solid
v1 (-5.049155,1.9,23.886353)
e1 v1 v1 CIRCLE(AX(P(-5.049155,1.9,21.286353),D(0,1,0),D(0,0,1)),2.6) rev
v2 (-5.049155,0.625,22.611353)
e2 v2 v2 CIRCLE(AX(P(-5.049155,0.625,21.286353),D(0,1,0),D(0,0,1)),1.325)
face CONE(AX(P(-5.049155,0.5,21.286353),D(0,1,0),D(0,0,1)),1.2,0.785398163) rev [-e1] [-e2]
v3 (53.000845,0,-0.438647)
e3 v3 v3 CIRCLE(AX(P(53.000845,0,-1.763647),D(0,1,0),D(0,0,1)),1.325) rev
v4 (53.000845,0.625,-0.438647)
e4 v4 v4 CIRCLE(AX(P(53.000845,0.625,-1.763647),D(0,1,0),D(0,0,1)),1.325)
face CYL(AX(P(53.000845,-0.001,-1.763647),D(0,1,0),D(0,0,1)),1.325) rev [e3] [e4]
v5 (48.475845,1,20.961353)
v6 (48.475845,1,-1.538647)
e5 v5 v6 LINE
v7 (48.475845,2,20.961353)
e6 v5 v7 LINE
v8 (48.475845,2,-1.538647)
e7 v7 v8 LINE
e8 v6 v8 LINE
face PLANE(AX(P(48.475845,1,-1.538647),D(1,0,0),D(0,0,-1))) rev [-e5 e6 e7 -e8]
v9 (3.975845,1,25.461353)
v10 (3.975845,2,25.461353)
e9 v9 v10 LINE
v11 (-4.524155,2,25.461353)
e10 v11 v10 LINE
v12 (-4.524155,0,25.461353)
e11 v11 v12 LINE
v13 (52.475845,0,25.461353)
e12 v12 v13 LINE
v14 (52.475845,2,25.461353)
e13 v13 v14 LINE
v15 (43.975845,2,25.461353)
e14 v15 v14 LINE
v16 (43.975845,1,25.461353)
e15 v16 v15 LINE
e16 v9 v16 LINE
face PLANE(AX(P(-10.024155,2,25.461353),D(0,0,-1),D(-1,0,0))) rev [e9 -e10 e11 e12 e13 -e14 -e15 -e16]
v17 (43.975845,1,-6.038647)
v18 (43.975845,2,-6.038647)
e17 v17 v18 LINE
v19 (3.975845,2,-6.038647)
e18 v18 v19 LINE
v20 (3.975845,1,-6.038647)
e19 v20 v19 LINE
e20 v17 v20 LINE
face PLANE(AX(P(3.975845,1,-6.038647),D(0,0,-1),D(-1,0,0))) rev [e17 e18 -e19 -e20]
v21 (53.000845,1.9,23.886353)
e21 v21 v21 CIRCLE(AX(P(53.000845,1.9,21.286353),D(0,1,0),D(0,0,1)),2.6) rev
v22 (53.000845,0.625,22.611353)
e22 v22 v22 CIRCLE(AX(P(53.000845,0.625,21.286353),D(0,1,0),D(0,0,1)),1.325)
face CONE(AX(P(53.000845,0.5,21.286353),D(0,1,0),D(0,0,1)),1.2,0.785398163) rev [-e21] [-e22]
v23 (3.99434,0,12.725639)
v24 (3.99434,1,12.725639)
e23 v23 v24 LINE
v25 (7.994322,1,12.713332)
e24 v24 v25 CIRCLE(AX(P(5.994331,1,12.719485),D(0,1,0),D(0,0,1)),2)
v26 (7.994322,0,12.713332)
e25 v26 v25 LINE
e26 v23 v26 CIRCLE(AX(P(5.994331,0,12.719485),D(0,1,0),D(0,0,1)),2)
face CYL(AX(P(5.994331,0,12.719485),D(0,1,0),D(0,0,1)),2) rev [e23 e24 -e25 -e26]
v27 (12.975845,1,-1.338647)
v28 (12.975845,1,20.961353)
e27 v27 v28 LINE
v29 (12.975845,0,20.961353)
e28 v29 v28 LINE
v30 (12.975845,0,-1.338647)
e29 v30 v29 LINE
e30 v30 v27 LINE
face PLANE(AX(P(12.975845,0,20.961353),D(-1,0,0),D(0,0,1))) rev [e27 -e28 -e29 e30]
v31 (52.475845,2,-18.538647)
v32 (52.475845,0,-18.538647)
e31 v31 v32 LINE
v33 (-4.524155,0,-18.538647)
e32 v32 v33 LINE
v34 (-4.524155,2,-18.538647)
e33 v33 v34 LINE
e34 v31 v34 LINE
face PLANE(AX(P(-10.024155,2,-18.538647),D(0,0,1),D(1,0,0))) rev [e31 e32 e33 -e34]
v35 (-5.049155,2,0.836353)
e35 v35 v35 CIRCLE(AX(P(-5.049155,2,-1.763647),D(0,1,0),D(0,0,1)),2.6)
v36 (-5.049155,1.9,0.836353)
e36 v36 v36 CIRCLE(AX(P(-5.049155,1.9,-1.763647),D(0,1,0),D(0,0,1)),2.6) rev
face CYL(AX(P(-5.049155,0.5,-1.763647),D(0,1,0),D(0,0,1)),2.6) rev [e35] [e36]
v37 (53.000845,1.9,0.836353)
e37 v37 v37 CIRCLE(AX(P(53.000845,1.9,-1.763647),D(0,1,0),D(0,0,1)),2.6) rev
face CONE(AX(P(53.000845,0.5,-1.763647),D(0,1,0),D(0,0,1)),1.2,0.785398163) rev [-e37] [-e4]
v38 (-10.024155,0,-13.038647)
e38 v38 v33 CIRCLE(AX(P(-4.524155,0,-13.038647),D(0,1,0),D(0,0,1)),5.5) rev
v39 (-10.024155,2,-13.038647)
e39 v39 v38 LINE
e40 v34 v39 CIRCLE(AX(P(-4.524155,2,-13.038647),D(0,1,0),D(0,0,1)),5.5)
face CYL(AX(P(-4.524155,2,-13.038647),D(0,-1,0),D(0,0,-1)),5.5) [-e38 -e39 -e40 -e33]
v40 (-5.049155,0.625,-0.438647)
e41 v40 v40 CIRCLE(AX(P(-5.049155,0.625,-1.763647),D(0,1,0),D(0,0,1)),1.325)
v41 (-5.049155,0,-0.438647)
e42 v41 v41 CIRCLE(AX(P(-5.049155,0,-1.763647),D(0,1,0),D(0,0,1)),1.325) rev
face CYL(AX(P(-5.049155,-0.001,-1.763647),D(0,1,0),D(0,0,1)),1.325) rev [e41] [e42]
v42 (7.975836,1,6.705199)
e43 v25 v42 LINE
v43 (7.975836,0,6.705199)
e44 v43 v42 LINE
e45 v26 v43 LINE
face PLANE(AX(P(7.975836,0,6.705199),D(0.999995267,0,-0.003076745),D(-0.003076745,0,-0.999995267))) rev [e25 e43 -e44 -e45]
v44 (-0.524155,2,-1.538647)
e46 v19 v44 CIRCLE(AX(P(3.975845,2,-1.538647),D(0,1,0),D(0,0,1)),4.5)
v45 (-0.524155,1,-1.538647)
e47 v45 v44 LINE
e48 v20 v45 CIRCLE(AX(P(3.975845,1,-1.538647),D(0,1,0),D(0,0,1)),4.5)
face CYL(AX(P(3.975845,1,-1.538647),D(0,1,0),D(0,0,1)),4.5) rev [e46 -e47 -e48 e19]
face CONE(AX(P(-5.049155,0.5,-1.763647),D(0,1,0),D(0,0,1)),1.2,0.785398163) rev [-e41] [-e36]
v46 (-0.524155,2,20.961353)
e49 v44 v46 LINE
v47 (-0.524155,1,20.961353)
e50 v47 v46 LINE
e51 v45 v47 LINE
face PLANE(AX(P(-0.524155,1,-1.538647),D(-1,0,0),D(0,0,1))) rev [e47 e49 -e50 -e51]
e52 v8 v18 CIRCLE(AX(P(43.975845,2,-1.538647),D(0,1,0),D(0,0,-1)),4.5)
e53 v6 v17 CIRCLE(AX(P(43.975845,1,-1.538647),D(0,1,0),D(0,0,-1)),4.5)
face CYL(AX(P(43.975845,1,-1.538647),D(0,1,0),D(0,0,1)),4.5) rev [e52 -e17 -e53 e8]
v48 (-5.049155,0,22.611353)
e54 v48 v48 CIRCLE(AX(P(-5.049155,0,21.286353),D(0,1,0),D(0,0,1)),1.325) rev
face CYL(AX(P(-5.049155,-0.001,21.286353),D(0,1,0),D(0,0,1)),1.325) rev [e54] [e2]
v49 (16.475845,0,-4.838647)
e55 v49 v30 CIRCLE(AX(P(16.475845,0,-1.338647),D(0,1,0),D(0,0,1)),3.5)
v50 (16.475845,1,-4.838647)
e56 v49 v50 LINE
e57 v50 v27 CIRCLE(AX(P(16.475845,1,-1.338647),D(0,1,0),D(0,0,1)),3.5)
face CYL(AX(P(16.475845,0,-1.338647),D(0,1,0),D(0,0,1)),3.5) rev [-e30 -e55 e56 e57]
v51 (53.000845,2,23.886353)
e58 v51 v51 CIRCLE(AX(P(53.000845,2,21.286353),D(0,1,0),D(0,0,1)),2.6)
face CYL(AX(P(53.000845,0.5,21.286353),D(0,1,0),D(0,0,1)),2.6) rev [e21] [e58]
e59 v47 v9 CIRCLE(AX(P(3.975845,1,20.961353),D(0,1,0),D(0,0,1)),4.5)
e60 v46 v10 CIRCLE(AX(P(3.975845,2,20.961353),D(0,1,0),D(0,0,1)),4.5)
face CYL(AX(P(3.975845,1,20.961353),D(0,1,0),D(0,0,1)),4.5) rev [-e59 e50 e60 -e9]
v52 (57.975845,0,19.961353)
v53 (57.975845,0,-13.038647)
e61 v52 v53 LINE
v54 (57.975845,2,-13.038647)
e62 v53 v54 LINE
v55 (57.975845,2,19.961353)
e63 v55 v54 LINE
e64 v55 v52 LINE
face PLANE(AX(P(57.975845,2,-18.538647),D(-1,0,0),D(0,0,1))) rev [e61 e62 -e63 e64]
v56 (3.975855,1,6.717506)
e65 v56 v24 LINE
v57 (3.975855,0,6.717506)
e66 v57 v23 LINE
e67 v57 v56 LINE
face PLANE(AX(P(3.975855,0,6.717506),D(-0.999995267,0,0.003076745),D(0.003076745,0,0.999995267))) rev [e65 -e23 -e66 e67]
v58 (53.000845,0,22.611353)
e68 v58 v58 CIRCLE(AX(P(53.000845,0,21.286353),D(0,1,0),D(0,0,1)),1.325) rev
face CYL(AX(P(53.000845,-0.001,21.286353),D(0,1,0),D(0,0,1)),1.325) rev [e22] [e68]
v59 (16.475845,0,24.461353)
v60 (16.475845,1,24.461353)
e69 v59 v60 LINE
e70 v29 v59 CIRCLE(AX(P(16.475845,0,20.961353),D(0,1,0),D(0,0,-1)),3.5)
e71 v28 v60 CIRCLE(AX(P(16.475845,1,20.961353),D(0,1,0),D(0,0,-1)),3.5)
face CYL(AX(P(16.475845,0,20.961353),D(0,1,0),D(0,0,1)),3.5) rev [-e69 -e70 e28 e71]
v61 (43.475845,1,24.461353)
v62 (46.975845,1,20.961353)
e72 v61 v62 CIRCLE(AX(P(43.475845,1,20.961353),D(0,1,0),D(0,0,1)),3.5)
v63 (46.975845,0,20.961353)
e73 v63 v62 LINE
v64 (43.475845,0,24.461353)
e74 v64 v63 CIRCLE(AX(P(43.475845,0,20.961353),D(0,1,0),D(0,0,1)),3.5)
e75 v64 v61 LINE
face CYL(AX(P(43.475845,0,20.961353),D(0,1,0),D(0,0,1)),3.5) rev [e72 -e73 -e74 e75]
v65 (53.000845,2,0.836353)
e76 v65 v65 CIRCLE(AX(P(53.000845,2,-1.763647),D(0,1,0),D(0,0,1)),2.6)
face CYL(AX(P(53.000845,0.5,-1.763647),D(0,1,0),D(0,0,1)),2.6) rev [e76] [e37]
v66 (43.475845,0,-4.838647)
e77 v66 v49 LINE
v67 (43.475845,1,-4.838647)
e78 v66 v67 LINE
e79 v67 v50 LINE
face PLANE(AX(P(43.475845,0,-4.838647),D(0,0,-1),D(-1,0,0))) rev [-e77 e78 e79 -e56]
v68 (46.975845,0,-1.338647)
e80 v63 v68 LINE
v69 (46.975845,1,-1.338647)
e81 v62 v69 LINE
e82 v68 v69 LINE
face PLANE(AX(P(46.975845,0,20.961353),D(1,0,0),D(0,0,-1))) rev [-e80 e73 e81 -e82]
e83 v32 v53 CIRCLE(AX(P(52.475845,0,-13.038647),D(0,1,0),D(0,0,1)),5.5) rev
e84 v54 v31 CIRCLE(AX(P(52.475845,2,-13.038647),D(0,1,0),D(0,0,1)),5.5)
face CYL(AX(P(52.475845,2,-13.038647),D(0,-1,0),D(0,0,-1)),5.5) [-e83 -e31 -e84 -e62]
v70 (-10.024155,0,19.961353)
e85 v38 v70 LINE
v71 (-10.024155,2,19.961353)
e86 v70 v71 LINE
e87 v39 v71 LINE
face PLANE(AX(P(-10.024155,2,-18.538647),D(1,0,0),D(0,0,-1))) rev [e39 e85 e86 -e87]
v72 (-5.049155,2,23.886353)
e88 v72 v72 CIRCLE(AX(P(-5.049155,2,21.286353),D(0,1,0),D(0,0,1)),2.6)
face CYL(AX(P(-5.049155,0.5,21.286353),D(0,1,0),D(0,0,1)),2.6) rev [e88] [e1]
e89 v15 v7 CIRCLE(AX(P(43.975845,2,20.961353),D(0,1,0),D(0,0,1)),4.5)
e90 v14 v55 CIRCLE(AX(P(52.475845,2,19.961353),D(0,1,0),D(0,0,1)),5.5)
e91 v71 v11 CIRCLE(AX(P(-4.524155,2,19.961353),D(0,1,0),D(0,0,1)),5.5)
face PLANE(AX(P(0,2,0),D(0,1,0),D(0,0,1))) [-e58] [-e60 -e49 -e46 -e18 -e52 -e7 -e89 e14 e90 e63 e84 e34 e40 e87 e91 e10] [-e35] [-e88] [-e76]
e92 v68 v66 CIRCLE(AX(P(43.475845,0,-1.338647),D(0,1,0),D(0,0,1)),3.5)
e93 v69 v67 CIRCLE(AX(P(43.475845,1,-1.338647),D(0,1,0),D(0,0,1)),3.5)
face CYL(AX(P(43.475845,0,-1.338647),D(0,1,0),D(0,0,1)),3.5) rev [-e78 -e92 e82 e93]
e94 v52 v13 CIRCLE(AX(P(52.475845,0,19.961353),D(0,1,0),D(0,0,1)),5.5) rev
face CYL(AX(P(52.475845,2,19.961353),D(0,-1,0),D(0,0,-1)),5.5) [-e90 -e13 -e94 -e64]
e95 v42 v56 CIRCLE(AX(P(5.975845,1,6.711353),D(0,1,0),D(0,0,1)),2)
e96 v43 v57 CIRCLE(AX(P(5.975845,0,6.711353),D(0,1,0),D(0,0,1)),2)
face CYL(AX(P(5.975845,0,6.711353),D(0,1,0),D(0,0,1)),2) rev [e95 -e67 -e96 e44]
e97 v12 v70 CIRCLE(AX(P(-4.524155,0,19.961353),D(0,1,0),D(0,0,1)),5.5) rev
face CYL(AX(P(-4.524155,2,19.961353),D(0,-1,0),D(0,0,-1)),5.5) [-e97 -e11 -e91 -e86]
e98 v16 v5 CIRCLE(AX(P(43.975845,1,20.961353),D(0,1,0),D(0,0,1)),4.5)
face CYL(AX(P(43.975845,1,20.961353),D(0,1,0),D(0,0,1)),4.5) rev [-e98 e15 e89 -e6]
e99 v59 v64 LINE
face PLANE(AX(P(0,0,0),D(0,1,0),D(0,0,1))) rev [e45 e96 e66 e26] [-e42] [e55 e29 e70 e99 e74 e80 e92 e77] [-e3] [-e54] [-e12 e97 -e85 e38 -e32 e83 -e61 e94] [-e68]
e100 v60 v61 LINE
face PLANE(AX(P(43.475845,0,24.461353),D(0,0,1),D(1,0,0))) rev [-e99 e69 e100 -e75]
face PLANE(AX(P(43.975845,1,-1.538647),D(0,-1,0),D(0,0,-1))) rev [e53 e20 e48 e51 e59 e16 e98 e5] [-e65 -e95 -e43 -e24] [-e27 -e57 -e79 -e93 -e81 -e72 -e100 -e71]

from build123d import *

# Parameters (mm, degrees)
SKETCH_1_W          = 68
SKETCH_1_H          = 44
EXTRUDE_1_DEPTH     = 2
FILLET_1_R          = 5.5
CUT_EXTRUDE_1_DEPTH = 1
CUT_EXTRUDE_2_DEPTH = 1
CUT_EXTRUDE_3_REACH = 65.352
SKETCH_5_R          = 1.325
CUT_EXTRUDE_5_DEPTH = 64.328343814
SKETCH_6_R          = 2.6
CUT_EXTRUDE_6_DEPTH = 1.5
CHAMFER_2_SIZE      = 1.4


with BuildPart() as part:
    # 草图1 → 凸台-拉伸1 (new body)
    with BuildSketch(Plane(origin=(0, 0, 0), x_dir=(1, 0, 0), z_dir=(0, 1, 0))):
        with Locations((23.975845411, -3.461352657)):
            Rectangle(SKETCH_1_W, SKETCH_1_H)
    extrude(amount=EXTRUDE_1_DEPTH)

    # 圆角1
    fillet_1_edges = [part.edges().sort_by_distance(p)[0] for p in [
        (-10.024154589, 1, -18.538647343),
        (57.975845411, 1, -18.538647343),
        (57.975845411, 1, 25.461352657),
        (-10.024154589, 1, 25.461352657),
    ]]
    fillet(fillet_1_edges, radius=FILLET_1_R)

    # 草图3 → 切除-拉伸1 (cut)
    with BuildSketch(Plane(origin=(0, 2, 0), x_dir=(1, 0, 0), z_dir=(0, 1, 0))):
        with BuildLine():
            Line((3.975845411, 6.038647343), (43.975845411, 6.038647343))
            ThreePointArc((43.975845411, 6.038647343), (47.157825926, 4.720627858), (48.475845411, 1.538647343))
            Line((48.475845411, 1.538647343), (48.475845411, -20.961352657))
            ThreePointArc((48.475845411, -20.961352657), (47.157825926, -24.143333172), (43.975845411, -25.461352657))
            Line((43.975845411, -25.461352657), (3.975845411, -25.461352657))
            ThreePointArc((3.975845411, -25.461352657), (0.793864895, -24.143333172), (-0.524154589, -20.961352657))
            Line((-0.524154589, -20.961352657), (-0.524154589, 1.538647343))
            ThreePointArc((-0.524154589, 1.538647343), (0.793864895, 4.720627858), (3.975845411, 6.038647343))
        make_face()
    extrude(amount=-CUT_EXTRUDE_1_DEPTH, mode=Mode.SUBTRACT)

    # 草图4 → 切除-拉伸2 (cut)
    with BuildSketch(Plane(origin=(0, 1, 0), x_dir=(1, 0, 0), z_dir=(0, 1, 0))):
        with BuildLine():
            Line((43.475845411, -24.461352657), (16.475845411, -24.461352657))
            ThreePointArc((16.475845411, -24.461352657), (14.000971676, -23.436226391), (12.975845411, -20.961352657))
            Line((12.975845411, -20.961352657), (12.975845411, 1.338647343))
            ThreePointArc((12.975845411, 1.338647343), (14.000971676, 3.813521077), (16.475845411, 4.838647343))
            Line((16.475845411, 4.838647343), (43.475845411, 4.838647343))
            ThreePointArc((43.475845411, 4.838647343), (45.950719145, 3.813521077), (46.975845411, 1.338647343))
            Line((46.975845411, 1.338647343), (46.975845411, -20.961352657))
            ThreePointArc((46.975845411, -20.961352657), (45.950719145, -23.436226391), (43.475845411, -24.461352657))
        make_face()
    extrude(amount=-CUT_EXTRUDE_2_DEPTH, mode=Mode.SUBTRACT)

    # 草图5 → 切除-拉伸3 (cut, up to next)
    with BuildSketch(Plane(origin=(0, 2, 0), x_dir=(1, 0, 0), z_dir=(0, 1, 0)), mode=Mode.PRIVATE) as cut_extrude_3_sk1:
        with Locations(Location((53.000845411, -21.286352657, 0), (0, 0, 270))):
            Circle(SKETCH_5_R)
    cut_extrude_3_tool1 = extrude(cut_extrude_3_sk1.sketch, amount=-CUT_EXTRUDE_3_REACH, mode=Mode.PRIVATE) & part.part
    # 草图5 → 切除-拉伸3 (cut, up to next)
    with BuildSketch(Plane(origin=(0, 2, 0), x_dir=(1, 0, 0), z_dir=(0, 1, 0)), mode=Mode.PRIVATE) as cut_extrude_3_sk2:
        with Locations(Location((53.000845411, 1.763647343, 0), (0, 0, 270))):
            Circle(SKETCH_5_R)
    cut_extrude_3_tool2 = extrude(cut_extrude_3_sk2.sketch, amount=-CUT_EXTRUDE_3_REACH, mode=Mode.PRIVATE) & part.part
    # 草图5 → 切除-拉伸3 (cut, up to next)
    with BuildSketch(Plane(origin=(0, 2, 0), x_dir=(1, 0, 0), z_dir=(0, 1, 0)), mode=Mode.PRIVATE) as cut_extrude_3_sk3:
        with Locations(Location((-5.049154589, 1.763647343, 0), (0, 0, 270))):
            Circle(SKETCH_5_R)
    cut_extrude_3_tool3 = extrude(cut_extrude_3_sk3.sketch, amount=-CUT_EXTRUDE_3_REACH, mode=Mode.PRIVATE) & part.part
    # 草图5 → 切除-拉伸3 (cut, up to next)
    with BuildSketch(Plane(origin=(0, 2, 0), x_dir=(1, 0, 0), z_dir=(0, 1, 0)), mode=Mode.PRIVATE) as cut_extrude_3_sk4:
        with Locations(Location((-5.049154589, -21.286352657, 0), (0, 0, 270))):
            Circle(SKETCH_5_R)
    cut_extrude_3_tool4 = extrude(cut_extrude_3_sk4.sketch, amount=-CUT_EXTRUDE_3_REACH, mode=Mode.PRIVATE) & part.part
    add(cut_extrude_3_tool1.solids().sort_by_distance((53.000845, 2, 21.286353))[0], mode=Mode.SUBTRACT)
    add(cut_extrude_3_tool2.solids().sort_by_distance((53.000845, 2, -1.763647))[0], mode=Mode.SUBTRACT)
    add(cut_extrude_3_tool3.solids().sort_by_distance((-5.049155, 2, -1.763647))[0], mode=Mode.SUBTRACT)
    add(cut_extrude_3_tool4.solids().sort_by_distance((-5.049155, 2, 21.286353))[0], mode=Mode.SUBTRACT)

    # 草图7 → 切除-拉伸5 (cut, through all)
    with BuildSketch(Plane(origin=(0, 1, 0), x_dir=(1, 0, 0), z_dir=(0, 1, 0))):
        with BuildLine():
            Line((7.975835944, -6.705199166), (7.994321526, -12.713332009))
            ThreePointArc((7.994321526, -12.713332009), (6.000484483, -14.719476033), (3.994340459, -12.72563899))
            Line((3.994340459, -12.72563899), (3.975854877, -6.717506148))
            ThreePointArc((3.975854877, -6.717506148), (5.96969192, -4.711362123), (7.975835944, -6.705199166))
        make_face()
    extrude(amount=-CUT_EXTRUDE_5_DEPTH, mode=Mode.SUBTRACT)

    # 草图6 → 切除-拉伸6 (cut)
    with BuildSketch(Plane(origin=(0, 2, 0), x_dir=(1, 0, 0), z_dir=(0, 1, 0))):
        with Locations(Location((-5.049154589, 1.763647343, 0), (0, 0, 270))):
            Circle(SKETCH_6_R)
        with Locations(Location((-5.049154589, -21.286352657, 0), (0, 0, 270))):
            Circle(SKETCH_6_R)
        with Locations(Location((53.000845411, 1.763647343, 0), (0, 0, 270))):
            Circle(SKETCH_6_R)
        with Locations(Location((53.000845411, -21.286352657, 0), (0, 0, 270))):
            Circle(SKETCH_6_R)
    extrude(amount=-CUT_EXTRUDE_6_DEPTH, mode=Mode.SUBTRACT)

    # 倒角2
    # the kernel refuses this chamfer: 1.4 mm, written as the material it adds along each edge
    with BuildSketch(Plane(origin=(53.000845411, 0.5, 21.286352657), x_dir=(0, 0, 1), z_dir=(-1, 0, 0))) as chamfer_2_piece_1_section:
        Polygon((2.6, CHAMFER_2_SIZE), (2.6 - CHAMFER_2_SIZE, 0), (2.6, 0), align=None)
    chamfer_2_piece_1 = revolve(axis=Axis((53.000845411, 0.5, 21.286352657), (0, 1, 0)), mode=Mode.PRIVATE)
    chamfer_2_piece_1 = chamfer_2_piece_1 - Plane(origin=(53.000845411, 1.265114472, 21.286352657), x_dir=(0, 0, 1), z_dir=(0, 1, 0)) * Cylinder(1.325, 11, mode=Mode.PRIVATE)
    add(chamfer_2_piece_1)
    with BuildSketch(Plane(origin=(-5.049154589, 0.5, 21.286352657), x_dir=(0, 0, 1), z_dir=(-1, 0, 0))) as chamfer_2_piece_2_section:
        Polygon((2.6, CHAMFER_2_SIZE), (2.6 - CHAMFER_2_SIZE, 0), (2.6, 0), align=None)
    chamfer_2_piece_2 = revolve(axis=Axis((-5.049154589, 0.5, 21.286352657), (0, 1, 0)), mode=Mode.PRIVATE)
    chamfer_2_piece_2 = chamfer_2_piece_2 - Plane(origin=(-5.049154589, 1.265114472, 21.286352657), x_dir=(0, 0, 1), z_dir=(0, 1, 0)) * Cylinder(1.325, 11, mode=Mode.PRIVATE)
    add(chamfer_2_piece_2)
    with BuildSketch(Plane(origin=(-5.049154589, 0.5, -1.763647343), x_dir=(0, 0, 1), z_dir=(-1, 0, 0))) as chamfer_2_piece_3_section:
        Polygon((2.6, CHAMFER_2_SIZE), (2.6 - CHAMFER_2_SIZE, 0), (2.6, 0), align=None)
    chamfer_2_piece_3 = revolve(axis=Axis((-5.049154589, 0.5, -1.763647343), (0, 1, 0)), mode=Mode.PRIVATE)
    chamfer_2_piece_3 = chamfer_2_piece_3 - Plane(origin=(-5.049154589, 1.265114472, -1.763647343), x_dir=(0, 0, 1), z_dir=(0, 1, 0)) * Cylinder(1.325, 11, mode=Mode.PRIVATE)
    add(chamfer_2_piece_3)
    with BuildSketch(Plane(origin=(53.000845411, 0.5, -1.763647343), x_dir=(0, 0, 1), z_dir=(-1, 0, 0))) as chamfer_2_piece_4_section:
        Polygon((2.6, CHAMFER_2_SIZE), (2.6 - CHAMFER_2_SIZE, 0), (2.6, 0), align=None)
    chamfer_2_piece_4 = revolve(axis=Axis((53.000845411, 0.5, -1.763647343), (0, 1, 0)), mode=Mode.PRIVATE)
    chamfer_2_piece_4 = chamfer_2_piece_4 - Plane(origin=(53.000845411, 1.265114472, -1.763647343), x_dir=(0, 0, 1), z_dir=(0, 1, 0)) * Cylinder(1.325, 11, mode=Mode.PRIVATE)
    add(chamfer_2_piece_4)


solid = part.part
